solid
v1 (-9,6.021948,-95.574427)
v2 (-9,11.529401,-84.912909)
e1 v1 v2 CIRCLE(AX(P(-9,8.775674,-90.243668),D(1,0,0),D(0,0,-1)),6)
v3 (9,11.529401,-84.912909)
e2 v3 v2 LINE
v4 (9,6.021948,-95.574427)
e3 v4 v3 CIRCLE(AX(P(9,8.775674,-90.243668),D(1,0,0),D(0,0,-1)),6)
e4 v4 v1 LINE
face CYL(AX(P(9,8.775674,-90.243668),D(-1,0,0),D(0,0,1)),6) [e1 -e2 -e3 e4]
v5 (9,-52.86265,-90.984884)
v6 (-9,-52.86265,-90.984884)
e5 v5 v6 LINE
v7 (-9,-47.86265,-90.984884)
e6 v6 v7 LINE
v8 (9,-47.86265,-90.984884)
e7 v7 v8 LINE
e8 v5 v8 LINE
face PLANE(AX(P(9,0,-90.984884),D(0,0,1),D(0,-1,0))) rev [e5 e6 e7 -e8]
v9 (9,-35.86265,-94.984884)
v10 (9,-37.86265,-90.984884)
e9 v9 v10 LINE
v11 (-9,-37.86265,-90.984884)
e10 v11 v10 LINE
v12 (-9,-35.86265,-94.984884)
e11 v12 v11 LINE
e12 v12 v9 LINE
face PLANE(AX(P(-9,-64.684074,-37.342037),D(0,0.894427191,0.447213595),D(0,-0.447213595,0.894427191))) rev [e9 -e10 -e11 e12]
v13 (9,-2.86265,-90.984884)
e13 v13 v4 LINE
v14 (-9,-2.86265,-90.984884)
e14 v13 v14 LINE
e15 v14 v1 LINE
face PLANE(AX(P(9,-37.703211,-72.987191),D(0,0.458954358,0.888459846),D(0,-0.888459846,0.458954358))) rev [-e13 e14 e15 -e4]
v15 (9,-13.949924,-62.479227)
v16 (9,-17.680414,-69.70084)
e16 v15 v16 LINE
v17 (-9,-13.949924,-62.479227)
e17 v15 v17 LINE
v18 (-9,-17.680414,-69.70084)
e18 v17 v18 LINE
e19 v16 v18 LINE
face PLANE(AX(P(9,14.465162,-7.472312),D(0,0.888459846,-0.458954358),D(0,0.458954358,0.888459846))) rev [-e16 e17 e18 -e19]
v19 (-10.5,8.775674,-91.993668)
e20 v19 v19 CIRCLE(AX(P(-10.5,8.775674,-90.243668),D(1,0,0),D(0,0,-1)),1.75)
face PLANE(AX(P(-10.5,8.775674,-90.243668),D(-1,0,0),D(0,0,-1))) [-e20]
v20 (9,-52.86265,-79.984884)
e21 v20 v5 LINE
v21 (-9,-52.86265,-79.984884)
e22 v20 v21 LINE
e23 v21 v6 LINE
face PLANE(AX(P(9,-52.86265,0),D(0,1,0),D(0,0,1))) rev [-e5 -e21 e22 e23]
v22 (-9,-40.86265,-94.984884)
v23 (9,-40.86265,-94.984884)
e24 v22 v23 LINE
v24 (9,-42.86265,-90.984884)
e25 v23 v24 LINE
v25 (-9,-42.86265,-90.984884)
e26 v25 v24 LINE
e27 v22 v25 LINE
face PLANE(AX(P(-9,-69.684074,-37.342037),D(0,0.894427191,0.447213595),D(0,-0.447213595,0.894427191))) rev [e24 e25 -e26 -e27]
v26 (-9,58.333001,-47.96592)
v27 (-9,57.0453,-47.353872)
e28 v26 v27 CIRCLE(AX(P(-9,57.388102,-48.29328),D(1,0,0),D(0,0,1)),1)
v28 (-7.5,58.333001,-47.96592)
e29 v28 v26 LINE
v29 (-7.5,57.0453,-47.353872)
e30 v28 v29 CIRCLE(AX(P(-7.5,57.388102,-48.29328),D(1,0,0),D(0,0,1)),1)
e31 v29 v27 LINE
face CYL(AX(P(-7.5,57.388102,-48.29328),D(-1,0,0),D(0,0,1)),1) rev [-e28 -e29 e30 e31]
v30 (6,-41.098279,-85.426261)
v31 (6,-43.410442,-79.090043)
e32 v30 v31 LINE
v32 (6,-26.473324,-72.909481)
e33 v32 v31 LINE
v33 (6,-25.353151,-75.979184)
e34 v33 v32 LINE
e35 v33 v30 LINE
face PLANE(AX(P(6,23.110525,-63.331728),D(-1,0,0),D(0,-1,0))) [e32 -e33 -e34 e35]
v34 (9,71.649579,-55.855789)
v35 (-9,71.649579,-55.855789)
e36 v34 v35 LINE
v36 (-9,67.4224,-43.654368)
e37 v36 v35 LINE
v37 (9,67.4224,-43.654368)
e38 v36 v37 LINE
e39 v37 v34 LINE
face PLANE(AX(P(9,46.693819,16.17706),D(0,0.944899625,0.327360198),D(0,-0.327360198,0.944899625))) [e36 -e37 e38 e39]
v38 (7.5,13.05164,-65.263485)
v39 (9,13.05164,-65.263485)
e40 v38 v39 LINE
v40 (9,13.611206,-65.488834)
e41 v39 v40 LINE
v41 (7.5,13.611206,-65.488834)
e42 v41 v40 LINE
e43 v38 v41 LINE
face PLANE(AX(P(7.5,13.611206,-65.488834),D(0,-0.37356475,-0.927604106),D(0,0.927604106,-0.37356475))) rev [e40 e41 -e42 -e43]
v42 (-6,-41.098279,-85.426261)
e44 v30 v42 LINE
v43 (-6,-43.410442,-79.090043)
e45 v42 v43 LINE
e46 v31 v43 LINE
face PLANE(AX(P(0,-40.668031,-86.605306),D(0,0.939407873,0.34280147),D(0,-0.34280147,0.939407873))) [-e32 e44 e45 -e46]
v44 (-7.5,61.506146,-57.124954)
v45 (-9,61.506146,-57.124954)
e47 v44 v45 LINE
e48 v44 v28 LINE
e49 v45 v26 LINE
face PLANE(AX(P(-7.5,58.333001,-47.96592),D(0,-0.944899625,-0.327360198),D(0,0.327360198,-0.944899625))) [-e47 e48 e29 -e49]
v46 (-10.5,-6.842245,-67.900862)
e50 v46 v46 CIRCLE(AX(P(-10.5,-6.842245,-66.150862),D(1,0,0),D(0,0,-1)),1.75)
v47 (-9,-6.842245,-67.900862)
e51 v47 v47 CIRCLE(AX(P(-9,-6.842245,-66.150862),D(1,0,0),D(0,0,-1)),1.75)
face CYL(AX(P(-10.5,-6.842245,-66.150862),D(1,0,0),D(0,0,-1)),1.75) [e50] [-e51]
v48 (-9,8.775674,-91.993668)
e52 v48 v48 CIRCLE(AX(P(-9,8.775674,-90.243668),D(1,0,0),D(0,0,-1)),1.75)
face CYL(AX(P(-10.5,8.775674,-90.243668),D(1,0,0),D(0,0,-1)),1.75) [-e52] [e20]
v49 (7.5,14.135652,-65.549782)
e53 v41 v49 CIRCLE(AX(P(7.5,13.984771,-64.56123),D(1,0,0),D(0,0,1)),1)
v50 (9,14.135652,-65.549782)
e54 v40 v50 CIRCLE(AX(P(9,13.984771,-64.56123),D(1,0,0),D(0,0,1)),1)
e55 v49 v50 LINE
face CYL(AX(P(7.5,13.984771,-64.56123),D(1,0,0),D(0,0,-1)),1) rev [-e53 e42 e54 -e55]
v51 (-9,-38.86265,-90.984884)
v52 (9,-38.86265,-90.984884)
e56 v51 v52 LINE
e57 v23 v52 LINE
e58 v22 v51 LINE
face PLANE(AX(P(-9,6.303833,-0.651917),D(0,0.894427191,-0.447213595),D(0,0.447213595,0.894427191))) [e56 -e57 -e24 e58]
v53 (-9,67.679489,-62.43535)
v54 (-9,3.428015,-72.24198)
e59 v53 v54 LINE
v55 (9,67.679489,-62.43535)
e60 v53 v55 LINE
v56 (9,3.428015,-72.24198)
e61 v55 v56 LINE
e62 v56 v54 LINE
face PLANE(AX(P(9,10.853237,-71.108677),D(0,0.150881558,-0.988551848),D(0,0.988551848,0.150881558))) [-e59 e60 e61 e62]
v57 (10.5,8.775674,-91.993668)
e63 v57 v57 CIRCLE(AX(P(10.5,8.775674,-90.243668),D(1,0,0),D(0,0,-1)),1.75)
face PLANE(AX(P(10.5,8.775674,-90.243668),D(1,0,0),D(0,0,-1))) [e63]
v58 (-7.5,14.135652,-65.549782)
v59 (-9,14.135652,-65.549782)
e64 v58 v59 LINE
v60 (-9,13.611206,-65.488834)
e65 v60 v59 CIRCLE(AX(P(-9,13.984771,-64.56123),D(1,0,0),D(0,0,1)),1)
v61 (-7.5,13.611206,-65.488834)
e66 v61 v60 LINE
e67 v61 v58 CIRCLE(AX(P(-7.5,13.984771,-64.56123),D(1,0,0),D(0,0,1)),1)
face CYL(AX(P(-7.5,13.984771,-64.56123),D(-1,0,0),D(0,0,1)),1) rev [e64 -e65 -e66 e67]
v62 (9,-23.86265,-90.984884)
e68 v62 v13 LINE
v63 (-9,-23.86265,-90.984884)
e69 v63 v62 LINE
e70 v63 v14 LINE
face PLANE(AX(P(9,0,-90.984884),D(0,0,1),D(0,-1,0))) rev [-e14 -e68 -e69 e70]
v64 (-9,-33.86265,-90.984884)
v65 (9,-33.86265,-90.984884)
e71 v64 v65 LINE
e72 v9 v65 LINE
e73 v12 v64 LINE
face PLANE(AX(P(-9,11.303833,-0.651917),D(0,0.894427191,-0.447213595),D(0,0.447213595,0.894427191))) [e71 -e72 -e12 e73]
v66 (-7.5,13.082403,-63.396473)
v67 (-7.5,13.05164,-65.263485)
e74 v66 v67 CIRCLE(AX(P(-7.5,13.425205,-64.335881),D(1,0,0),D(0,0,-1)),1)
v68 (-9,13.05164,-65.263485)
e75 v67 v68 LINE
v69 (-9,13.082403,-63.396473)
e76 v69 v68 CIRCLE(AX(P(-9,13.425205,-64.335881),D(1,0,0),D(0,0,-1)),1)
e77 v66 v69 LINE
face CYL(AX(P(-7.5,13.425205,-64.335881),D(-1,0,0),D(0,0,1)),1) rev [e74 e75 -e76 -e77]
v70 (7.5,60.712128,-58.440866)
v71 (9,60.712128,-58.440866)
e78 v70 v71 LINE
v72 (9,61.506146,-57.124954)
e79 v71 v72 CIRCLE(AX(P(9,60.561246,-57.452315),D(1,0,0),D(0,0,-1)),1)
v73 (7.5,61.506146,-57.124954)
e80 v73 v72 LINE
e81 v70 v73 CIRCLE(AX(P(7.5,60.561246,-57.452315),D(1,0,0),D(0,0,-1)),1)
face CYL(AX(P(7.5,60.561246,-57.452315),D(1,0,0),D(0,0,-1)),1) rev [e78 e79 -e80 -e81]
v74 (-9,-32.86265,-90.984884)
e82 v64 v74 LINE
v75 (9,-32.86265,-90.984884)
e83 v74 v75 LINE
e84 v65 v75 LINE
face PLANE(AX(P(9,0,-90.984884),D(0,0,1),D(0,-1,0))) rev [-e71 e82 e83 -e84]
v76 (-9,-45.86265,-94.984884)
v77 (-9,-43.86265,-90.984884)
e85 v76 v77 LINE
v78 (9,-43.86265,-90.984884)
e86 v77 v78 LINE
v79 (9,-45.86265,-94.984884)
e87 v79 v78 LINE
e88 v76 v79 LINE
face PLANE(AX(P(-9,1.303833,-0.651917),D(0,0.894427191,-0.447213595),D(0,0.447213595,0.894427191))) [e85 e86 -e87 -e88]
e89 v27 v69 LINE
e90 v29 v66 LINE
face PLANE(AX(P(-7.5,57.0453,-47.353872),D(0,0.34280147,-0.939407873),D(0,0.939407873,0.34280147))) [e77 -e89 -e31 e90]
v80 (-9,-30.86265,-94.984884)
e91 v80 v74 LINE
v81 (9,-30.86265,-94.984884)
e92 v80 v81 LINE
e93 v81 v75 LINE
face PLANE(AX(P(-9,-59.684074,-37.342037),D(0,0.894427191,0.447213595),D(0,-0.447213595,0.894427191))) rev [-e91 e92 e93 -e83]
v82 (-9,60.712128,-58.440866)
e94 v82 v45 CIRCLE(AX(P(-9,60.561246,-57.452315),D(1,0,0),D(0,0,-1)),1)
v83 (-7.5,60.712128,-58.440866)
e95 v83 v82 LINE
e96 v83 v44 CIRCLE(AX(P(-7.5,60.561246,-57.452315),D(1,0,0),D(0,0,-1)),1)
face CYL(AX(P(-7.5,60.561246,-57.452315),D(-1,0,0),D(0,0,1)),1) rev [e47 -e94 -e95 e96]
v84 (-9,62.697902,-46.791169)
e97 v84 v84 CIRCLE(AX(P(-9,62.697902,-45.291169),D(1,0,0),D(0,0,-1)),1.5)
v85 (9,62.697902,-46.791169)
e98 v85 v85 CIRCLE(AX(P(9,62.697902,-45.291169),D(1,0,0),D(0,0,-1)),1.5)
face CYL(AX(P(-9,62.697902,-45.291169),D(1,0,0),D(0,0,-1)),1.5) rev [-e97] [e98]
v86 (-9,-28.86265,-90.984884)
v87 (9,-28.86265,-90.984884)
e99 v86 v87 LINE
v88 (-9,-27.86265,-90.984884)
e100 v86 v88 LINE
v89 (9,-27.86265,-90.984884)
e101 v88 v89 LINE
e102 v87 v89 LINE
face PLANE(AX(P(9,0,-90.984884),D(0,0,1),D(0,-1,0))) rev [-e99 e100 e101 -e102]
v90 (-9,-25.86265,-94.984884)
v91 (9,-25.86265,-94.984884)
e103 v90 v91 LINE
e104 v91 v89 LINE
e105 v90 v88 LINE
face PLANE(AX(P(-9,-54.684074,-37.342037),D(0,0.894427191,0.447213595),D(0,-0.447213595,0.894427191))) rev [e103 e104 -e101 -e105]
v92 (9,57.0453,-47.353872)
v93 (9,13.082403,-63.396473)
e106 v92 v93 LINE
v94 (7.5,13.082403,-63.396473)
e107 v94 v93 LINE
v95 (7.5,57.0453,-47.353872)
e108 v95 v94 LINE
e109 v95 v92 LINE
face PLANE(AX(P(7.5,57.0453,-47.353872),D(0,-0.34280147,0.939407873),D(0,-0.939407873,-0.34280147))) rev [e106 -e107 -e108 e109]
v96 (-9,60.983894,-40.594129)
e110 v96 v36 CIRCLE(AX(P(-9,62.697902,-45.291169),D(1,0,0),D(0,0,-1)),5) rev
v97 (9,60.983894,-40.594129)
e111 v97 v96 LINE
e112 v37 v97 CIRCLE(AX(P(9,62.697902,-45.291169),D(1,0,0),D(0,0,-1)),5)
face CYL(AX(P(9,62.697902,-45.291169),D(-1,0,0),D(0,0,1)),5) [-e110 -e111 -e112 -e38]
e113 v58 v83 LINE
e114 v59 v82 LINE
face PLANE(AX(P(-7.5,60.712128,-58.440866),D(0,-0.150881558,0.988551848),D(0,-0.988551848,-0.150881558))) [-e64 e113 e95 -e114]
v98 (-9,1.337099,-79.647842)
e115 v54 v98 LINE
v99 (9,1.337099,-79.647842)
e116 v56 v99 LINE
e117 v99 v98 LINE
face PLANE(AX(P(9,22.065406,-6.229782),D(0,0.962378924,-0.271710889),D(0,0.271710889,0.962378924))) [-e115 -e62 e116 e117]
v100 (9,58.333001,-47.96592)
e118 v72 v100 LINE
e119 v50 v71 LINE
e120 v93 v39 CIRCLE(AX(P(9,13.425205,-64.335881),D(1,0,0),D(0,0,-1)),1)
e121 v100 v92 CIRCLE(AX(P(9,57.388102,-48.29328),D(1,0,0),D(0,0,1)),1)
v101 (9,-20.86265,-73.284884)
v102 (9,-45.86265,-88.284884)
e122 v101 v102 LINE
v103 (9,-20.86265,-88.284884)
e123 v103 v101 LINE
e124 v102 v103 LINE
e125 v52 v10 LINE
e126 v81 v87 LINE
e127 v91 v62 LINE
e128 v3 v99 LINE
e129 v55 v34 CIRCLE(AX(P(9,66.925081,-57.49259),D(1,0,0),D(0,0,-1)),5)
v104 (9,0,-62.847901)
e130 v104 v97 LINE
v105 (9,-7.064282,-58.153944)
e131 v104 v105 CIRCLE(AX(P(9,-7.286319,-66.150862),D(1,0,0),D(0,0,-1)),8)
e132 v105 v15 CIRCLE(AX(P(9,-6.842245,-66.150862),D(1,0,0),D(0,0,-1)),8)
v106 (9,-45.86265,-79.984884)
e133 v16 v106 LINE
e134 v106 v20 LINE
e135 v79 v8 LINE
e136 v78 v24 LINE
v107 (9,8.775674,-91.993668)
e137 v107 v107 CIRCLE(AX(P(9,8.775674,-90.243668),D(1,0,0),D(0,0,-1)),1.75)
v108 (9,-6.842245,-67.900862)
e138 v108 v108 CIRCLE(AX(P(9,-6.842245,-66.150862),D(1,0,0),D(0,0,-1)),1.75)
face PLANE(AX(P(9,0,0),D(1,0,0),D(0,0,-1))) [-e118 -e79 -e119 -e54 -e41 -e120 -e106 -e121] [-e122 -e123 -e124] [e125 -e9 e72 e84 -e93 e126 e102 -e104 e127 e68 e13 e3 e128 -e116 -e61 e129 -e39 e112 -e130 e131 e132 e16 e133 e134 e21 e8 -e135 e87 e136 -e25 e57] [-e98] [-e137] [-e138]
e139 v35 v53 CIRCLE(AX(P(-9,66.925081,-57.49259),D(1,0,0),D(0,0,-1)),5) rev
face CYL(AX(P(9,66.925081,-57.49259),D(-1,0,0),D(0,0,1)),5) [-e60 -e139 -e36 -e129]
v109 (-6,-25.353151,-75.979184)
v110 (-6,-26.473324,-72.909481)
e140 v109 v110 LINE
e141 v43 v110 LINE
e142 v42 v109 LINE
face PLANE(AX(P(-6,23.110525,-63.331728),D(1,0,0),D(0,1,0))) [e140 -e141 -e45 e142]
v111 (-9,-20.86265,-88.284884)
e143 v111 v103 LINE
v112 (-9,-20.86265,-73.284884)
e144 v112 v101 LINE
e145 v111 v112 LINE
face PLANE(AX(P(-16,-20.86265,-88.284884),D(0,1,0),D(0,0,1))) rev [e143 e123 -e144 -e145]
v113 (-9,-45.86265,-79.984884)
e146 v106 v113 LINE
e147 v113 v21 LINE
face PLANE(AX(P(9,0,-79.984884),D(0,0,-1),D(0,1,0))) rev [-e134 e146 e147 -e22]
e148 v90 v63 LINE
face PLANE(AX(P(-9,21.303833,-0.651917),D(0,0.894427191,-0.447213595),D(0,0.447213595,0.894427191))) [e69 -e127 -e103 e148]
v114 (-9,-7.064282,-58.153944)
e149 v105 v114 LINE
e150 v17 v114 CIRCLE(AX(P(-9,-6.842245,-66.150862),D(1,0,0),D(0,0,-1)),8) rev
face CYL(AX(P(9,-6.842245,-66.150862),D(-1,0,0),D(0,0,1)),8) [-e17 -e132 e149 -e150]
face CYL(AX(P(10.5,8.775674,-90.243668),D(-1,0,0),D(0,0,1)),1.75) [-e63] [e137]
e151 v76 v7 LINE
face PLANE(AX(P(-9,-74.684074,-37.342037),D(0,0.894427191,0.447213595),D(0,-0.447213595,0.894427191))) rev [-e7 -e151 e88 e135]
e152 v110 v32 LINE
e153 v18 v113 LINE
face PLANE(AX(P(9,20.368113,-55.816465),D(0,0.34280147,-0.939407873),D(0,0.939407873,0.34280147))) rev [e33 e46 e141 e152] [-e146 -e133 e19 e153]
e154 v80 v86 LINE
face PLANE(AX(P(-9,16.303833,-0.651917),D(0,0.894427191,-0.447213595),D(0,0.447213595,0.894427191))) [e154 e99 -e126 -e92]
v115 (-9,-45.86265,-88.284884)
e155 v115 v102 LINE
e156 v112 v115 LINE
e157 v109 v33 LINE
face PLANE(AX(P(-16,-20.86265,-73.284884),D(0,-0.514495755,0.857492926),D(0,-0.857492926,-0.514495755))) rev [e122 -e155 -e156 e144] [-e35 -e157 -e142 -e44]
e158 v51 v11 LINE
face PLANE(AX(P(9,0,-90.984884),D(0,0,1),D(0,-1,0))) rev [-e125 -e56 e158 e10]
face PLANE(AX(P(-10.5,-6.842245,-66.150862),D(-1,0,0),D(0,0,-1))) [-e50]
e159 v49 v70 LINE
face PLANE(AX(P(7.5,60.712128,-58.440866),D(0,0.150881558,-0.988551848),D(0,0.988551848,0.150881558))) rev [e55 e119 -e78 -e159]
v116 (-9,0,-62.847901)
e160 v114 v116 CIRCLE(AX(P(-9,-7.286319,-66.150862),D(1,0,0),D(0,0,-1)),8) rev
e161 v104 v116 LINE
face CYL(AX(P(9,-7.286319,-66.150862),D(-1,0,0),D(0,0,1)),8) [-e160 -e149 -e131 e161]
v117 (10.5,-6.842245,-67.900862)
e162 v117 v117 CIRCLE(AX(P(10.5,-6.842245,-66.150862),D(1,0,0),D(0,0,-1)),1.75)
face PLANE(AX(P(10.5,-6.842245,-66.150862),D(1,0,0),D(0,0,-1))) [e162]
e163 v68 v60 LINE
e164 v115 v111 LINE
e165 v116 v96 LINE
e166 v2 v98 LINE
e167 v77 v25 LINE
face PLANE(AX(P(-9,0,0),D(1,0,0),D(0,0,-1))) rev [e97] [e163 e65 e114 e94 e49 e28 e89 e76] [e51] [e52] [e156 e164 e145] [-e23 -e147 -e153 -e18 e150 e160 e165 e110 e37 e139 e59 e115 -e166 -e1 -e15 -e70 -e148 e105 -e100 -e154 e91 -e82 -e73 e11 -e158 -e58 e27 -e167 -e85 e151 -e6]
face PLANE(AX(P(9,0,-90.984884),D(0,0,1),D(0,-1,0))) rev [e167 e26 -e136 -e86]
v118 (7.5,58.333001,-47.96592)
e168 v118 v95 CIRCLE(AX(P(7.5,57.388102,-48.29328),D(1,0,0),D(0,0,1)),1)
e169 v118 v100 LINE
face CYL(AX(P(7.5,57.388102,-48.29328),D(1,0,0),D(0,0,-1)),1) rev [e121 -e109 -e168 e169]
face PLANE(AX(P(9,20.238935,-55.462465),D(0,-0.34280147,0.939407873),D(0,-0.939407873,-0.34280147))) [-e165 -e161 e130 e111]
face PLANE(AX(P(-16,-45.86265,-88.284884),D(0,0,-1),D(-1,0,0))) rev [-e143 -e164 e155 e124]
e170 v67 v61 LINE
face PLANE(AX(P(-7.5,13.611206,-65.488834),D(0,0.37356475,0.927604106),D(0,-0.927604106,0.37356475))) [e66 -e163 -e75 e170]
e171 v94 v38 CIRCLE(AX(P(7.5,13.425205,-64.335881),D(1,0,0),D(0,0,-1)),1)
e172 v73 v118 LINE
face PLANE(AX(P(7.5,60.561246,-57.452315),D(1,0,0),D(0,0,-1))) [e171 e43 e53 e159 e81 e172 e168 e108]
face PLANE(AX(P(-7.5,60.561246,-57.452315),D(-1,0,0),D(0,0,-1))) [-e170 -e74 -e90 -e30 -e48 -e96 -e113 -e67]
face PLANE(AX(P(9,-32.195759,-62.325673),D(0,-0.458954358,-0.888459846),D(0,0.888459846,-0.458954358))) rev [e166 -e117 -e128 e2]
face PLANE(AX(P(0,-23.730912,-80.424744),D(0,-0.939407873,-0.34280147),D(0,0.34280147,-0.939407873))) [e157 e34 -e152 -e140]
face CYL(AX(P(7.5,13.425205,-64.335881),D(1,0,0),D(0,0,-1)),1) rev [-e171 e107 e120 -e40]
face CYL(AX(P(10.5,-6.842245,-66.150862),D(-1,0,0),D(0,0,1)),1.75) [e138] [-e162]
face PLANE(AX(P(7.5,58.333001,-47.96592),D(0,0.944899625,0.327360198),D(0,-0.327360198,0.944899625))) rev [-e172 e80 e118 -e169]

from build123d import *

# Parameters (mm, degrees)
BOSS_EXTRUDE1_DEPTH = 9
CUT_EXTRUDE1_DEPTH  = 25
BOSS_EXTRUDE2_DEPTH = 18
LPATTERN1_COUNT     = 5
LPATTERN1_PITCH     = 5
FILLET2_R           = 5
FILLET3_R           = 8
SKETCH4_R           = 1.5
CUT_EXTRUDE2_DEPTH  = 18
SKETCH6_W           = 6
SKETCH6_H           = 18.02956864
CUT_EXTRUDE3_DEPTH  = 8
SKETCH7_R           = 1.75
BOSS_EXTRUDE3_DEPTH = 1.5
CUT_EXTRUDE8_DEPTH  = 1.5


with BuildPart() as part:
    # Sketch1 → Boss-Extrude1 (new, symmetric)
    with BuildSketch(Plane(origin=(0, 0, 0), x_dir=(0, 0, -1), z_dir=(1, 0, 0))):
        with BuildLine():
            Line((90.984883898, -2.862650195), (95.574427473, 6.021948264))
            ThreePointArc((95.574427473, 6.021948264), (92.997394543, 14.106433484), (84.912909322, 11.529400554))
            Line((84.912909322, 11.529400554), (79.647841616, 1.337098931))
            Line((79.647841616, 1.337098931), (72.241979914, 3.428014696))
            Line((72.241979914, 3.428014696), (62.847901181, 0))
            Line((62.847901181, 0), (58.150861814, -1.714007348))
            Line((58.150861814, -1.714007348), (58.150861814, -11.714007348))
            Line((58.150861814, -11.714007348), (69.700839811, -17.680413995))
            Line((69.700839811, -17.680413995), (79.984883898, -45.862650195))
            Line((79.984883898, -45.862650195), (79.984883898, -52.862650195))
            Line((79.984883898, -52.862650195), (90.984883898, -52.862650195))
            Line((90.984883898, -52.862650195), (90.984883898, -2.862650195))
        make_face()
        Polygon((72.241979914, 3.428014696), (62.847901181, 0), (38.851798311, 65.758551133), (61.529389306, 73.615195879), align=None)
    extrude(amount=BOSS_EXTRUDE1_DEPTH, both=True)

    # Sketch2 → Cut-Extrude1 (cut)
    with BuildSketch(Plane(origin=(9, 0, 0), x_dir=(0, 0, -1), z_dir=(1, 0, 0))):
        Polygon((88.284883898, -45.862650195), (88.284883898, -20.862650195), (73.284883898, -20.862650195), align=None)
    extrude(amount=-CUT_EXTRUDE1_DEPTH, mode=Mode.SUBTRACT)

    # Sketch3 → Boss-Extrude2 (add)
    with BuildSketch(Plane(origin=(9, 0, 0), x_dir=(0, 0, -1), z_dir=(1, 0, 0))):
        Polygon((94.984883898, -45.862650195), (90.984883898, -45.862650195), (90.984883898, -47.862650195), align=None)
        Polygon((90.984883898, -43.862650195), (90.984883898, -45.862650195), (94.984883898, -45.862650195), align=None)
    boss_extrude2 = extrude(amount=-BOSS_EXTRUDE2_DEPTH)

    # LPattern1: Boss-Extrude2 ×5
    with Locations(*[(0, i * LPATTERN1_PITCH, 0) for i in range(1, LPATTERN1_COUNT)]):
        add(boss_extrude2)

    # Fillet2
    fillet2_edges = [part.edges().sort_by_distance(p)[0] for p in [
        (0, 65.758551133, -38.851798311),
        (0, 73.615195879, -61.529389306),
    ]]
    fillet(fillet2_edges, radius=FILLET2_R)

    # Fillet3
    # the kernel refuses this fillet: 8 mm, written as the material it takes off along each edge
    with BuildSketch(Plane(origin=(-21.179405631, -11.714007348, -58.150861814), x_dir=(0, 1, 0), z_dir=(1, 0, 0))) as fillet3_piece_1:
        with BuildLine():
            CenterArc((FILLET3_R * 0.608970281556, -FILLET3_R), FILLET3_R, 90, 62.680345336)
            Line((-FILLET3_R * 0.279489564314, -FILLET3_R * 0.541045642491), (-FILLET3_R * 0.297258761231, -FILLET3_R * 0.531866555341))
            Line((-FILLET3_R * 0.297258761231, -FILLET3_R * 0.531866555341), (-FILLET3_R * 0.0121794056311, FILLET3_R * 0.02))
            Line((-FILLET3_R * 0.0121794056311, FILLET3_R * 0.02), (FILLET3_R * 0.608970281556, FILLET3_R * 0.02))
            Line((FILLET3_R * 0.608970281556, FILLET3_R * 0.02), (FILLET3_R * 0.608970281556, 0))
        make_face()
    extrude(amount=42.358811262, mode=Mode.SUBTRACT)
    with BuildSketch(Plane(origin=(-22.930780243, -1.714007348, -58.150861814), x_dir=(0, 0.34280146956229973, -0.9394078733254942), z_dir=(1, 0, 0))) as fillet3_piece_2:
        with BuildLine():
            CenterArc((5.605066211, -7.977085613), FILLET3_R, 94.33760972, 65.614743341)
            Line((-1.910196776, -5.234673857), (-2.060502036, -5.179825622))
            Line((-2.060502036, -5.179825622), (-0.15030526, 0.054848235))
            Line((-0.15030526, 0.054848235), (0, 0.16))
            ThreePointArc((0, 0.16), (2.5, 0.16), (4.987898676, 0.159541712))
            Line((4.987898676, 0.159541712), (5, 0))
        make_face()
    extrude(amount=45.861560486, mode=Mode.SUBTRACT)

    # Sketch4 → Cut-Extrude2 (cut)
    with BuildSketch(Plane(origin=(9, 0, 0), x_dir=(0, 0, -1), z_dir=(1, 0, 0))):
        with Locations((45.291168566, 62.697901722)):
            Circle(SKETCH4_R)
    extrude(amount=-CUT_EXTRUDE2_DEPTH, mode=Mode.SUBTRACT)

    # Sketch6 → Cut-Extrude3 (cut)
    with BuildSketch(Plane(origin=(0, 20.368113495, -55.816464867), x_dir=(1, 0, 0), z_dir=(0, -0.342801469564146, 0.9394078733248205))):
        with Locations((-3, -58.877510112)):
            Rectangle(SKETCH6_W, SKETCH6_H)
        with Locations((3, -58.877510112)):
            Rectangle(SKETCH6_W, SKETCH6_H)
    extrude(amount=-CUT_EXTRUDE3_DEPTH, mode=Mode.SUBTRACT)

    # Sketch7 → Boss-Extrude3 (add)
    with BuildSketch(Plane(origin=(9, 0, 0), x_dir=(0, 0, -1), z_dir=(1, 0, 0))):
        with Locations((90.243668397, 8.775674409)):
            Circle(SKETCH7_R)
        with Locations((66.150861814, -6.842245095)):
            Circle(SKETCH7_R)
    boss_extrude3 = extrude(amount=BOSS_EXTRUDE3_DEPTH)

    # Sketch9 → Cut-Extrude8 (cut)
    with BuildSketch(Plane(origin=(9, 0, 0), x_dir=(0, 0, -1), z_dir=(1, 0, 0))):
        with BuildLine():
            Line((58.440866419, 60.71212793), (65.549781573, 14.135652246))
            ThreePointArc((65.549781573, 14.135652246), (65.554544576, 13.869334092), (65.488833832, 13.611205938))
            Line((65.488833832, 13.611205938), (65.263485326, 13.051639762))
            ThreePointArc((65.263485326, 13.051639762), (64.319406176, 12.425340234), (63.396473347, 13.082403042))
            Line((63.396473347, 13.082403042), (47.353872306, 57.045300124))
            ThreePointArc((47.353872306, 57.045300124), (47.390108621, 57.817381382), (47.965919982, 58.333001219))
            Line((47.965919982, 58.333001219), (57.124954374, 61.506145996))
            ThreePointArc((57.124954374, 61.506145996), (57.968947683, 61.417453255), (58.440866419, 60.71212793))
        make_face()
    cut_extrude8 = extrude(amount=-CUT_EXTRUDE8_DEPTH, mode=Mode.SUBTRACT)

    # Mirror1: Boss-Extrude3, Cut-Extrude8 across plane
    add(boss_extrude3.mirror(Plane(origin=(0, 0, 0), x_dir=(0, 0, 1), z_dir=(1, 0, 0))))
    add(cut_extrude8.mirror(Plane(origin=(0, 0, 0), x_dir=(0, 0, 1), z_dir=(1, 0, 0))), mode=Mode.SUBTRACT)


solid = part.part
